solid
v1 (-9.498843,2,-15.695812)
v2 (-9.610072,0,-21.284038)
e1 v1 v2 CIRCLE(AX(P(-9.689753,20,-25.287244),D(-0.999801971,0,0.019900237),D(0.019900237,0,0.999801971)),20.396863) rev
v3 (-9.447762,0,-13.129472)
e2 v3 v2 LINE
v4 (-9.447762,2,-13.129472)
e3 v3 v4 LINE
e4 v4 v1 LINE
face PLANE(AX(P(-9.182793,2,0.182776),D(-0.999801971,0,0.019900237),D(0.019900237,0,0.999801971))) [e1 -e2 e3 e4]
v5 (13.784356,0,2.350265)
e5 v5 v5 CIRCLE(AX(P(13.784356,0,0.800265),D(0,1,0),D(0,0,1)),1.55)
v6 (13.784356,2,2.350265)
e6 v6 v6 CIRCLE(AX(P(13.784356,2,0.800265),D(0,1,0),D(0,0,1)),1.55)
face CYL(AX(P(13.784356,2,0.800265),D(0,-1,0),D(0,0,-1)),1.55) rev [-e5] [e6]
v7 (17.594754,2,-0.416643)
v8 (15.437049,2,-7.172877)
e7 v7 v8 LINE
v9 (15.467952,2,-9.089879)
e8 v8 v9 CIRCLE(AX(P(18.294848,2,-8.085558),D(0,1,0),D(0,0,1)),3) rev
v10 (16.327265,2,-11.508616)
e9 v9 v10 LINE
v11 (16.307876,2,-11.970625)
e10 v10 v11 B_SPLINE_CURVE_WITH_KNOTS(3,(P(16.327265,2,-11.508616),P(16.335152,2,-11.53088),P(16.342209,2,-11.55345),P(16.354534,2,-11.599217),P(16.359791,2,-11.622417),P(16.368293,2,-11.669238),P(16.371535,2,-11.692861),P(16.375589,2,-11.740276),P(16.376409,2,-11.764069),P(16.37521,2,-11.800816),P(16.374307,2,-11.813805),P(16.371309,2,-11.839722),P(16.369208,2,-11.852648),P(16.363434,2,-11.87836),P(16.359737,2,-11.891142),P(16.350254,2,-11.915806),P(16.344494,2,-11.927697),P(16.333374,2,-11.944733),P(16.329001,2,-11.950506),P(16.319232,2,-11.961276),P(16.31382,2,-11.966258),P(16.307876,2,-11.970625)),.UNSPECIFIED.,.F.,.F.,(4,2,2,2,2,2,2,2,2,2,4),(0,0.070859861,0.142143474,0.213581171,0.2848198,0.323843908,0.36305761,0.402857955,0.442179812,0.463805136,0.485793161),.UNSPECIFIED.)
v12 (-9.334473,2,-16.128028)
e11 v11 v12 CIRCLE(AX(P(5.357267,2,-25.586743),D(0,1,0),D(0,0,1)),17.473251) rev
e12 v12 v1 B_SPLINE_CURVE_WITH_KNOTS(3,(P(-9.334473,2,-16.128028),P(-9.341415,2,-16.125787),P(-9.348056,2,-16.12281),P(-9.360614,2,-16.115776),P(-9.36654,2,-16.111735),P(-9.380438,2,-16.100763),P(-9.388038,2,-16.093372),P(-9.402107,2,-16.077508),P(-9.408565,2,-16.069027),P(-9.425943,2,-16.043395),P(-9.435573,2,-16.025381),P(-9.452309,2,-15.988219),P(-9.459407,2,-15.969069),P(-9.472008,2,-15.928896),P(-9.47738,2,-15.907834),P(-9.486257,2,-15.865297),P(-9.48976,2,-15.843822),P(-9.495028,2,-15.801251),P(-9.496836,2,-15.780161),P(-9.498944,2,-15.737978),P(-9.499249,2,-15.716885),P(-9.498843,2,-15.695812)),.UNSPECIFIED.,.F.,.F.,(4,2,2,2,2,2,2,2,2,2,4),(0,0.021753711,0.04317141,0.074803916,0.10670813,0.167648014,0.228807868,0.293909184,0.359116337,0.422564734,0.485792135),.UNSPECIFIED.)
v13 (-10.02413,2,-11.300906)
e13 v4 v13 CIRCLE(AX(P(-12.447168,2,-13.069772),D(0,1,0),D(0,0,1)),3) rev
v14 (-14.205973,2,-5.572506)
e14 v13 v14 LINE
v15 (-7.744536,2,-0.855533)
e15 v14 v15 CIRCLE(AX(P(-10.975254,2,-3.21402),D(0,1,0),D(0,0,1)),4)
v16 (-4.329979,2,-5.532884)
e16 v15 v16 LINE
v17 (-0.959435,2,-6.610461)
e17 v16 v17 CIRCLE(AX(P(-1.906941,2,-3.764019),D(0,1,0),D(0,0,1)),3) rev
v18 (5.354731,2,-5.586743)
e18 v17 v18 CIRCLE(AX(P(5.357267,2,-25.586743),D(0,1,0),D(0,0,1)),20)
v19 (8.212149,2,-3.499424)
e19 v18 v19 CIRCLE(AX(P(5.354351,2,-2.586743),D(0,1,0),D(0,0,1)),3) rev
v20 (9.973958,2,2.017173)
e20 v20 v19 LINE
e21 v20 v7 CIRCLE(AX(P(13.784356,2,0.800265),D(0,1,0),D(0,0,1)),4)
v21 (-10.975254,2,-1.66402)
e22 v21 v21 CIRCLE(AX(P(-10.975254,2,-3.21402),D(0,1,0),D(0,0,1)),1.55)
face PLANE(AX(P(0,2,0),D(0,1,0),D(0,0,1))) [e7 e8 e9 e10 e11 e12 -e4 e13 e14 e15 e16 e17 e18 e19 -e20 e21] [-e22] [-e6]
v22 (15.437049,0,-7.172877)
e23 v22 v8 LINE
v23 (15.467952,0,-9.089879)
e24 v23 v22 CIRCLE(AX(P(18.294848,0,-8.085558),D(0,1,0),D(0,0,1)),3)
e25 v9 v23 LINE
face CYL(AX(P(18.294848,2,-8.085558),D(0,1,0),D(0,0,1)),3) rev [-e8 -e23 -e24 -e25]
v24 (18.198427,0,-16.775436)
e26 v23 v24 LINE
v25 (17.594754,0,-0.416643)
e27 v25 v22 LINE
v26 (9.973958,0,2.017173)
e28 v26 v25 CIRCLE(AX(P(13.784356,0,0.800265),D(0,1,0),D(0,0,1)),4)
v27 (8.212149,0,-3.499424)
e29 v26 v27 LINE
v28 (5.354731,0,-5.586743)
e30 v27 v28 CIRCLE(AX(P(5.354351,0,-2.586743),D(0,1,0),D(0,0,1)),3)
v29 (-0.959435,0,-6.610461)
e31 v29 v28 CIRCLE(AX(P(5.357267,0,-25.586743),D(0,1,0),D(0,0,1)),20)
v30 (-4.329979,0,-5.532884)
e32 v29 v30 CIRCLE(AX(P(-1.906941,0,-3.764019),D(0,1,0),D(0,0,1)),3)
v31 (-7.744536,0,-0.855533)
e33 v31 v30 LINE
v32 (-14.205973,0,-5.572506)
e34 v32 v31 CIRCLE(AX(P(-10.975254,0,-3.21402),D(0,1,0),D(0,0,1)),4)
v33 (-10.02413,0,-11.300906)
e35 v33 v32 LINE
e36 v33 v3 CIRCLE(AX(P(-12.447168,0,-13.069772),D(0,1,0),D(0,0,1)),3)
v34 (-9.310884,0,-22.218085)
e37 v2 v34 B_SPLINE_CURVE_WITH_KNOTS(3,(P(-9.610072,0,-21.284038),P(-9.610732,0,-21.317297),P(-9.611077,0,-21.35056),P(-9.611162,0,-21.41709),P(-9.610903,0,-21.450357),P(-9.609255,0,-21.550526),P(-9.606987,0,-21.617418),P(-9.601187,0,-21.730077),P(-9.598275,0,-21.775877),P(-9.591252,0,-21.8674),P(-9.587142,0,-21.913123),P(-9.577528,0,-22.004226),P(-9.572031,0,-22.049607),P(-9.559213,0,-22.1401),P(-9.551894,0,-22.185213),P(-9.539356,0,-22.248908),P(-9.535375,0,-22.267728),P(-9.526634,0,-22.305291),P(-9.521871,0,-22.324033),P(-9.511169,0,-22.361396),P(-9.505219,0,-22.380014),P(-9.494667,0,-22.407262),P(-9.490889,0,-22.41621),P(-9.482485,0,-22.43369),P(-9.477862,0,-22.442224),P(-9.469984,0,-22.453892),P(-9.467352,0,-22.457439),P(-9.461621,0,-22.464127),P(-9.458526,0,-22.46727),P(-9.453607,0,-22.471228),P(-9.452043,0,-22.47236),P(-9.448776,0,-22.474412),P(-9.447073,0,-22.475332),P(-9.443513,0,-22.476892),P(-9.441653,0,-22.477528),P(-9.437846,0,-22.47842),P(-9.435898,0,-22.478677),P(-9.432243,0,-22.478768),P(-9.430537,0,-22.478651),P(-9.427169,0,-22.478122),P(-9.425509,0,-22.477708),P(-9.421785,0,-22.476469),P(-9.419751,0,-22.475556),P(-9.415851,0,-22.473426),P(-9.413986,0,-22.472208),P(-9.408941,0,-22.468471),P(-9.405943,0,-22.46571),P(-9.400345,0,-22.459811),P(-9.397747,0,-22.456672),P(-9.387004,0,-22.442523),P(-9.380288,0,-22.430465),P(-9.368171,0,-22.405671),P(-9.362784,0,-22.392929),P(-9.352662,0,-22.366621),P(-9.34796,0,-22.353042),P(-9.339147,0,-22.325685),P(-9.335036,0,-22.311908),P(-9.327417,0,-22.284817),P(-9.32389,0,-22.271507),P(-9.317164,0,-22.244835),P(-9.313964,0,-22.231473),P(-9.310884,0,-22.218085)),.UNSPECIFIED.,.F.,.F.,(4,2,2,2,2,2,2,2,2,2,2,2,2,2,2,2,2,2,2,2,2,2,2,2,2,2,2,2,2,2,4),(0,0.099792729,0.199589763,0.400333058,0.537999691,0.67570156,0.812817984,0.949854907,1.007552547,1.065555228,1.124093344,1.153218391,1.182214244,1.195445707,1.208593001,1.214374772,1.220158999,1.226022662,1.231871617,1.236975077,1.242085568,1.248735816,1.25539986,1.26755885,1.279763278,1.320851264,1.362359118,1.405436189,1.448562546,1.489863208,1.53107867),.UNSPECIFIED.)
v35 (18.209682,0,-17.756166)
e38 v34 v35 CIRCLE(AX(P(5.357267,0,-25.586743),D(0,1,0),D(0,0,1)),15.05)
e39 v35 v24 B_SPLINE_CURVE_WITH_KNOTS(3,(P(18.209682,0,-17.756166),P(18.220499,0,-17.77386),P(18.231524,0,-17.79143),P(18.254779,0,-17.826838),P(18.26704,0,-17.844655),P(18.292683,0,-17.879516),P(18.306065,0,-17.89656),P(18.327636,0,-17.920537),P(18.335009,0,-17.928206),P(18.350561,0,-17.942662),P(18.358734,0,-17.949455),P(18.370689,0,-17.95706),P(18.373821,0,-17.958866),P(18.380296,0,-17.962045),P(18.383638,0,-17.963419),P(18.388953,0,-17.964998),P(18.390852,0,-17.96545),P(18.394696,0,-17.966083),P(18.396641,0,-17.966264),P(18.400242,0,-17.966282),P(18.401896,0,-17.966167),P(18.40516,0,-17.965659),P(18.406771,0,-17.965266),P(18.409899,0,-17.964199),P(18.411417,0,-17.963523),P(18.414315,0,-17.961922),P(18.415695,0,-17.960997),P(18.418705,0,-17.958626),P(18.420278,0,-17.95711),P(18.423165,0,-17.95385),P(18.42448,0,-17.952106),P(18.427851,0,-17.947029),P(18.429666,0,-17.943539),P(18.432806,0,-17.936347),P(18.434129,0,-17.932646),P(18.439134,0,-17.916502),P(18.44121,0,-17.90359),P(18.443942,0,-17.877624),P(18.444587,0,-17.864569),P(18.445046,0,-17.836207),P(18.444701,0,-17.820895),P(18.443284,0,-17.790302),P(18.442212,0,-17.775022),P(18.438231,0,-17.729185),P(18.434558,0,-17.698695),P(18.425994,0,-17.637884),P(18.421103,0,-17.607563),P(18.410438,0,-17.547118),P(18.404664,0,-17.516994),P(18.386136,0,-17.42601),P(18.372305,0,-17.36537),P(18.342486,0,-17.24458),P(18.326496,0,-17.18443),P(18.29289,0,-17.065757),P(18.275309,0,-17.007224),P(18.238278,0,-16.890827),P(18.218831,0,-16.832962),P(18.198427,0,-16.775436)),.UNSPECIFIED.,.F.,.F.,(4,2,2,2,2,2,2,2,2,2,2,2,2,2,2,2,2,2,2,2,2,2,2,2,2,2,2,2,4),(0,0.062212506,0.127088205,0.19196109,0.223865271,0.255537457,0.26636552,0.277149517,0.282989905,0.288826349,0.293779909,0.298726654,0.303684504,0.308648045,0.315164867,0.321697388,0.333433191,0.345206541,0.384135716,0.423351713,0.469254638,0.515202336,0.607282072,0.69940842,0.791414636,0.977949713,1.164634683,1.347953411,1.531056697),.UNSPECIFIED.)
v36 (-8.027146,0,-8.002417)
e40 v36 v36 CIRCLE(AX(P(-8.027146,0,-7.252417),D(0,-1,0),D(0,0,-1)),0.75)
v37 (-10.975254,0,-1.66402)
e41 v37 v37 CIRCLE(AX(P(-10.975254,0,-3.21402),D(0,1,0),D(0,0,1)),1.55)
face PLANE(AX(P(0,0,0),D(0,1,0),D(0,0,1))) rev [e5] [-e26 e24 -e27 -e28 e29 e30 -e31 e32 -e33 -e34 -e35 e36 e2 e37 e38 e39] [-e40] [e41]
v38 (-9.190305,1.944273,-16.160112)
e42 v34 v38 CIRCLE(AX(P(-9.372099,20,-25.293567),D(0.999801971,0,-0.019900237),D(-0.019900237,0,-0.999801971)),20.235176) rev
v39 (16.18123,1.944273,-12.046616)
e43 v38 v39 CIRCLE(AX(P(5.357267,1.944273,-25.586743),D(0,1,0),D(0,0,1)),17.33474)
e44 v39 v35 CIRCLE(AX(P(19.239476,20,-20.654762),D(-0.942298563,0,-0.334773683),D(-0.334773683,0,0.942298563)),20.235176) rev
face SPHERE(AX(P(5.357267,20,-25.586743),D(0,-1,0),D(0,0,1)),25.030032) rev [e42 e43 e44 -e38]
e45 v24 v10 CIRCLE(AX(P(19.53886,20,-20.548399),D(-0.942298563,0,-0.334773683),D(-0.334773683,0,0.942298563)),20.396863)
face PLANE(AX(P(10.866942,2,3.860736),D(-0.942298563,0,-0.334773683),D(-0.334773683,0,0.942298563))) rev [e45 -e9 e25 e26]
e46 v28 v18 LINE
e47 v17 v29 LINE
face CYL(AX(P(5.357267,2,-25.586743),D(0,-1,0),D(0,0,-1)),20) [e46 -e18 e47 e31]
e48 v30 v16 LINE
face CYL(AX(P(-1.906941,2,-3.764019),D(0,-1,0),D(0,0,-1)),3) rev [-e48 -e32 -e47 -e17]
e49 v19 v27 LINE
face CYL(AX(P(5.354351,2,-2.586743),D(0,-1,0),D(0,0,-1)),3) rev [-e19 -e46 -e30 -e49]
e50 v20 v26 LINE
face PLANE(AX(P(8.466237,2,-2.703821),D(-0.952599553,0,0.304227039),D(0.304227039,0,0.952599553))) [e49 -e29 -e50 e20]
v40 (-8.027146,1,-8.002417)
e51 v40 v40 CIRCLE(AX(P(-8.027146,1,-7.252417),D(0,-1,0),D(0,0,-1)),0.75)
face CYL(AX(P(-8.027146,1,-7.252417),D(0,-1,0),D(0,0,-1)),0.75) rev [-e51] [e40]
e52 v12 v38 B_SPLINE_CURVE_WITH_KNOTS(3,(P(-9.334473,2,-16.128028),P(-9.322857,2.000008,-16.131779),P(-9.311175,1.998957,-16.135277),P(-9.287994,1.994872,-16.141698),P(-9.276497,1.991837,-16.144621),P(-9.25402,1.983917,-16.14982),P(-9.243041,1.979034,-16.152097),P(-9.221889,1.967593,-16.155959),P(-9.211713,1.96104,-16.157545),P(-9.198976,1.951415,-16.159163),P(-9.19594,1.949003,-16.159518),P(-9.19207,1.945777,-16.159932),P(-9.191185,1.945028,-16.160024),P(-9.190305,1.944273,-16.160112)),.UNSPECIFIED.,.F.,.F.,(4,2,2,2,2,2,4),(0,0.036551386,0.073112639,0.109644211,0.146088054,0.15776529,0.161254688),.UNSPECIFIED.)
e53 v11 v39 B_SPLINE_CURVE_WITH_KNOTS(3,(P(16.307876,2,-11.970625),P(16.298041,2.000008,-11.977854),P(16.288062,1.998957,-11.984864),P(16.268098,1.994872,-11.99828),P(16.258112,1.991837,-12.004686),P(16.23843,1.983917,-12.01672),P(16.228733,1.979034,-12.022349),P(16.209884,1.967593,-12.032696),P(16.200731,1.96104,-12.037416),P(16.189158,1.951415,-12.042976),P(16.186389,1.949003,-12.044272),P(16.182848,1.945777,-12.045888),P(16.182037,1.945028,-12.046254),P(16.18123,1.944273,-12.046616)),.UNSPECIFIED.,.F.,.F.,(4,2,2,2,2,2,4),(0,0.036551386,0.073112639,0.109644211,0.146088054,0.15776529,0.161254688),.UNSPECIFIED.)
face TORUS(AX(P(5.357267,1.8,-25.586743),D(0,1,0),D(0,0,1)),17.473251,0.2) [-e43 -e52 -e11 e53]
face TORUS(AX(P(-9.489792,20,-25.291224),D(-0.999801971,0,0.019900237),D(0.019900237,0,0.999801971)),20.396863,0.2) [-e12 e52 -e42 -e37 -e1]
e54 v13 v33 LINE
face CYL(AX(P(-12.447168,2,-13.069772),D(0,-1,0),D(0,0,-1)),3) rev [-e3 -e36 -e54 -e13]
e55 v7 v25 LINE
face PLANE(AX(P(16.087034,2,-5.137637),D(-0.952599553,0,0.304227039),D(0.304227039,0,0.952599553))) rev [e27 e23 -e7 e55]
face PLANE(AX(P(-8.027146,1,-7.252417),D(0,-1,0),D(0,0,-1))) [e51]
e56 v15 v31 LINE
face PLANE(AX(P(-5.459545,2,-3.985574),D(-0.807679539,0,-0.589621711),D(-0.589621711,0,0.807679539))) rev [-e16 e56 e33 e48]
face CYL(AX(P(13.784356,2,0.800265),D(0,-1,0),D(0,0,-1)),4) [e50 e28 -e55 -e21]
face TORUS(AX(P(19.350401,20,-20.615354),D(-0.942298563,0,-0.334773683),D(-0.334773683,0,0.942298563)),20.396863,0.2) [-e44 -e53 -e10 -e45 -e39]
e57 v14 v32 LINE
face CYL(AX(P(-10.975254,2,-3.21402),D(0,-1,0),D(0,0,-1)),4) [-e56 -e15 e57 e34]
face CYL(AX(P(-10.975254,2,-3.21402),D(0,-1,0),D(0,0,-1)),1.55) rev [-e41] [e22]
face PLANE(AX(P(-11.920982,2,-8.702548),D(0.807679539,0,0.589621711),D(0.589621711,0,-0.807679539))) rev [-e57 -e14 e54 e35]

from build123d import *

# Parameters (mm, degrees)
SKETCH_1_R          = 1.55
EXTRUDE_1_DEPTH     = 2
FILLET_1_R          = 3
FILLET_2_R          = 0.2
SKETCH_3_R          = 0.75
CUT_EXTRUDE_1_DEPTH = 1


with BuildPart() as part:
    # 草图1 → 凸台-拉伸1 (new body)
    with BuildSketch(Plane(origin=(0, 0, 0), x_dir=(1, 0, 0), z_dir=(0, 1, 0))):
        with BuildLine():
            Line((-9.427629845, 12.118007633), (-14.205972572, 5.57250637))
            ThreePointArc((-14.205972572, 5.57250637), (-13.333741258, -0.01669863), (-7.744536258, 0.855532684))
            Line((-7.744536258, 0.855532684), (-2.966193531, 7.401033946))
            ThreePointArc((-2.966193531, 7.401033946), (2.156455687, 5.844533995), (7.508476858, 5.702771934))
            Line((7.508476858, 5.702771934), (9.973957748, -2.017173013))
            ThreePointArc((9.973957748, -2.017173013), (15.001264118, -4.610663069), (17.594754173, 0.416643301))
            Line((17.594754173, 0.416643301), (15.129273283, 8.136588247))
            Line((15.129273283, 8.136588247), (19.53886034, 20.548398832))
            ThreePointArc((19.53886034, 20.548398832), (2.94865648, 10.730730666), (-9.689752685, 25.287244194))
            Line((-9.689752685, 25.287244194), (-9.427629845, 12.118007633))
        make_face()
        with Locations(Location((13.784355961, -0.800264856, 0), (0, 0, 270))):
            Circle(SKETCH_1_R, mode=Mode.SUBTRACT)
        with Locations(Location((-10.975254415, 3.214019527, 0), (0, 0, 270))):
            Circle(SKETCH_1_R, mode=Mode.SUBTRACT)
    extrude(amount=EXTRUDE_1_DEPTH)

    # 圆角1
    fillet_1_edges = [part.edges().sort_by_distance(p)[0] for p in [
        (-9.427629845, 1, -12.118007633),
        (15.129273283, 1, -8.136588247),
        (7.508476858, 1, -5.702771934),
        (-2.966193531, 1, -7.401033946),
    ]]
    fillet(fillet_1_edges, radius=FILLET_1_R)

    # 草图2 → 切除-旋转1 (revolve, cut)
    with BuildSketch(Plane(origin=(5.357266973, 0, 0), x_dir=(0, -1, 0), z_dir=(-1, 0, 0))):
        with BuildLine():
            Line((5.030031962, -25.586742765), (-45.030031962, -25.586742765))
            ThreePointArc((-45.030031962, -25.586742765), (-20, -0.556710804), (5.030031962, -25.586742765))
        make_face()
    revolve(axis=Axis((5.357266973, -5.030031962, -25.586742765), (0, 1, 0)), mode=Mode.SUBTRACT)

    # 圆角2
    # the kernel refuses this fillet: 0.2 mm, written as the material it takes off along each edge
    with BuildSketch(Plane(origin=(19.53886034, 20, -20.548398832), x_dir=(0.01660114178813642, -0.9987697013737693, -0.04672778305335893), z_dir=(0.33436181166525863, 0.049589148185380114, -0.9411392539269492))) as fillet_2_piece_1:
        with BuildLine():
            CenterArc((20.396862817, 0.2), FILLET_2_R, 143.943391902, 126.056608098)
            ThreePointArc((20.235175643, 0.317716854), (20.118215024, 0.158394169), (20, 0))
            Line((20, 0), (20.396862817, 0))
        make_face()
    revolve(axis=Axis((19.53886034, 20, -20.548398832), (-0.9422985625539585, 0, -0.3347736832678813)), revolution_arc=31.526762102, mode=Mode.SUBTRACT)
    with BuildSketch(Plane(origin=(-9.689752685, 20, -25.287244194), x_dir=(0.009551792559497672, -0.8772773226727593, 0.4798888021021284), z_dir=(0.017458026871632594, 0.4799838529826972, 0.87710359603278))) as fillet_2_piece_2:
        with BuildLine():
            CenterArc((20.396862817, 0.2), FILLET_2_R, 143.943391902, 126.056608098)
            ThreePointArc((20.235175643, 0.317716854), (20.118215024, 0.158394169), (20, 0))
            Line((20, 0), (20.396862817, 0))
        make_face()
    revolve(axis=Axis((-9.689752685, 20, -25.287244194), (0.9998019706705172, 0, -0.019900237268694068)), revolution_arc=31.526762102, mode=Mode.SUBTRACT)
    with BuildSketch(Plane(origin=(5.357266973, 2, -25.586742765), x_dir=(0.6563745928876489, 0, 0.7544351488442022), z_dir=(0.7544351488442022, 0, -0.6563745928876489))) as fillet_2_piece_3:
        with BuildLine():
            CenterArc((17.473251351, 0.2), FILLET_2_R, 226.167089334, 43.832910666)
            Line((17.473251351, 0), (17.392599001, 0))
            ThreePointArc((17.392599001, 0), (17.363691769, 0.027886958), (17.334739824, 0.055727492))
        make_face()
    revolve(axis=Axis((5.357266973, 2, -25.586742765), (0, -1, 0)), revolution_arc=100.466423908, mode=Mode.SUBTRACT)

    # 草图3 → 切除-拉伸1 (cut)
    with BuildSketch(Plane.XZ):
        with Locations(Location((-8.027145861, -7.252417223, 0), (0, 0, 270))):
            Circle(SKETCH_3_R)
    extrude(amount=-CUT_EXTRUDE_1_DEPTH, mode=Mode.SUBTRACT)


solid = part.part
